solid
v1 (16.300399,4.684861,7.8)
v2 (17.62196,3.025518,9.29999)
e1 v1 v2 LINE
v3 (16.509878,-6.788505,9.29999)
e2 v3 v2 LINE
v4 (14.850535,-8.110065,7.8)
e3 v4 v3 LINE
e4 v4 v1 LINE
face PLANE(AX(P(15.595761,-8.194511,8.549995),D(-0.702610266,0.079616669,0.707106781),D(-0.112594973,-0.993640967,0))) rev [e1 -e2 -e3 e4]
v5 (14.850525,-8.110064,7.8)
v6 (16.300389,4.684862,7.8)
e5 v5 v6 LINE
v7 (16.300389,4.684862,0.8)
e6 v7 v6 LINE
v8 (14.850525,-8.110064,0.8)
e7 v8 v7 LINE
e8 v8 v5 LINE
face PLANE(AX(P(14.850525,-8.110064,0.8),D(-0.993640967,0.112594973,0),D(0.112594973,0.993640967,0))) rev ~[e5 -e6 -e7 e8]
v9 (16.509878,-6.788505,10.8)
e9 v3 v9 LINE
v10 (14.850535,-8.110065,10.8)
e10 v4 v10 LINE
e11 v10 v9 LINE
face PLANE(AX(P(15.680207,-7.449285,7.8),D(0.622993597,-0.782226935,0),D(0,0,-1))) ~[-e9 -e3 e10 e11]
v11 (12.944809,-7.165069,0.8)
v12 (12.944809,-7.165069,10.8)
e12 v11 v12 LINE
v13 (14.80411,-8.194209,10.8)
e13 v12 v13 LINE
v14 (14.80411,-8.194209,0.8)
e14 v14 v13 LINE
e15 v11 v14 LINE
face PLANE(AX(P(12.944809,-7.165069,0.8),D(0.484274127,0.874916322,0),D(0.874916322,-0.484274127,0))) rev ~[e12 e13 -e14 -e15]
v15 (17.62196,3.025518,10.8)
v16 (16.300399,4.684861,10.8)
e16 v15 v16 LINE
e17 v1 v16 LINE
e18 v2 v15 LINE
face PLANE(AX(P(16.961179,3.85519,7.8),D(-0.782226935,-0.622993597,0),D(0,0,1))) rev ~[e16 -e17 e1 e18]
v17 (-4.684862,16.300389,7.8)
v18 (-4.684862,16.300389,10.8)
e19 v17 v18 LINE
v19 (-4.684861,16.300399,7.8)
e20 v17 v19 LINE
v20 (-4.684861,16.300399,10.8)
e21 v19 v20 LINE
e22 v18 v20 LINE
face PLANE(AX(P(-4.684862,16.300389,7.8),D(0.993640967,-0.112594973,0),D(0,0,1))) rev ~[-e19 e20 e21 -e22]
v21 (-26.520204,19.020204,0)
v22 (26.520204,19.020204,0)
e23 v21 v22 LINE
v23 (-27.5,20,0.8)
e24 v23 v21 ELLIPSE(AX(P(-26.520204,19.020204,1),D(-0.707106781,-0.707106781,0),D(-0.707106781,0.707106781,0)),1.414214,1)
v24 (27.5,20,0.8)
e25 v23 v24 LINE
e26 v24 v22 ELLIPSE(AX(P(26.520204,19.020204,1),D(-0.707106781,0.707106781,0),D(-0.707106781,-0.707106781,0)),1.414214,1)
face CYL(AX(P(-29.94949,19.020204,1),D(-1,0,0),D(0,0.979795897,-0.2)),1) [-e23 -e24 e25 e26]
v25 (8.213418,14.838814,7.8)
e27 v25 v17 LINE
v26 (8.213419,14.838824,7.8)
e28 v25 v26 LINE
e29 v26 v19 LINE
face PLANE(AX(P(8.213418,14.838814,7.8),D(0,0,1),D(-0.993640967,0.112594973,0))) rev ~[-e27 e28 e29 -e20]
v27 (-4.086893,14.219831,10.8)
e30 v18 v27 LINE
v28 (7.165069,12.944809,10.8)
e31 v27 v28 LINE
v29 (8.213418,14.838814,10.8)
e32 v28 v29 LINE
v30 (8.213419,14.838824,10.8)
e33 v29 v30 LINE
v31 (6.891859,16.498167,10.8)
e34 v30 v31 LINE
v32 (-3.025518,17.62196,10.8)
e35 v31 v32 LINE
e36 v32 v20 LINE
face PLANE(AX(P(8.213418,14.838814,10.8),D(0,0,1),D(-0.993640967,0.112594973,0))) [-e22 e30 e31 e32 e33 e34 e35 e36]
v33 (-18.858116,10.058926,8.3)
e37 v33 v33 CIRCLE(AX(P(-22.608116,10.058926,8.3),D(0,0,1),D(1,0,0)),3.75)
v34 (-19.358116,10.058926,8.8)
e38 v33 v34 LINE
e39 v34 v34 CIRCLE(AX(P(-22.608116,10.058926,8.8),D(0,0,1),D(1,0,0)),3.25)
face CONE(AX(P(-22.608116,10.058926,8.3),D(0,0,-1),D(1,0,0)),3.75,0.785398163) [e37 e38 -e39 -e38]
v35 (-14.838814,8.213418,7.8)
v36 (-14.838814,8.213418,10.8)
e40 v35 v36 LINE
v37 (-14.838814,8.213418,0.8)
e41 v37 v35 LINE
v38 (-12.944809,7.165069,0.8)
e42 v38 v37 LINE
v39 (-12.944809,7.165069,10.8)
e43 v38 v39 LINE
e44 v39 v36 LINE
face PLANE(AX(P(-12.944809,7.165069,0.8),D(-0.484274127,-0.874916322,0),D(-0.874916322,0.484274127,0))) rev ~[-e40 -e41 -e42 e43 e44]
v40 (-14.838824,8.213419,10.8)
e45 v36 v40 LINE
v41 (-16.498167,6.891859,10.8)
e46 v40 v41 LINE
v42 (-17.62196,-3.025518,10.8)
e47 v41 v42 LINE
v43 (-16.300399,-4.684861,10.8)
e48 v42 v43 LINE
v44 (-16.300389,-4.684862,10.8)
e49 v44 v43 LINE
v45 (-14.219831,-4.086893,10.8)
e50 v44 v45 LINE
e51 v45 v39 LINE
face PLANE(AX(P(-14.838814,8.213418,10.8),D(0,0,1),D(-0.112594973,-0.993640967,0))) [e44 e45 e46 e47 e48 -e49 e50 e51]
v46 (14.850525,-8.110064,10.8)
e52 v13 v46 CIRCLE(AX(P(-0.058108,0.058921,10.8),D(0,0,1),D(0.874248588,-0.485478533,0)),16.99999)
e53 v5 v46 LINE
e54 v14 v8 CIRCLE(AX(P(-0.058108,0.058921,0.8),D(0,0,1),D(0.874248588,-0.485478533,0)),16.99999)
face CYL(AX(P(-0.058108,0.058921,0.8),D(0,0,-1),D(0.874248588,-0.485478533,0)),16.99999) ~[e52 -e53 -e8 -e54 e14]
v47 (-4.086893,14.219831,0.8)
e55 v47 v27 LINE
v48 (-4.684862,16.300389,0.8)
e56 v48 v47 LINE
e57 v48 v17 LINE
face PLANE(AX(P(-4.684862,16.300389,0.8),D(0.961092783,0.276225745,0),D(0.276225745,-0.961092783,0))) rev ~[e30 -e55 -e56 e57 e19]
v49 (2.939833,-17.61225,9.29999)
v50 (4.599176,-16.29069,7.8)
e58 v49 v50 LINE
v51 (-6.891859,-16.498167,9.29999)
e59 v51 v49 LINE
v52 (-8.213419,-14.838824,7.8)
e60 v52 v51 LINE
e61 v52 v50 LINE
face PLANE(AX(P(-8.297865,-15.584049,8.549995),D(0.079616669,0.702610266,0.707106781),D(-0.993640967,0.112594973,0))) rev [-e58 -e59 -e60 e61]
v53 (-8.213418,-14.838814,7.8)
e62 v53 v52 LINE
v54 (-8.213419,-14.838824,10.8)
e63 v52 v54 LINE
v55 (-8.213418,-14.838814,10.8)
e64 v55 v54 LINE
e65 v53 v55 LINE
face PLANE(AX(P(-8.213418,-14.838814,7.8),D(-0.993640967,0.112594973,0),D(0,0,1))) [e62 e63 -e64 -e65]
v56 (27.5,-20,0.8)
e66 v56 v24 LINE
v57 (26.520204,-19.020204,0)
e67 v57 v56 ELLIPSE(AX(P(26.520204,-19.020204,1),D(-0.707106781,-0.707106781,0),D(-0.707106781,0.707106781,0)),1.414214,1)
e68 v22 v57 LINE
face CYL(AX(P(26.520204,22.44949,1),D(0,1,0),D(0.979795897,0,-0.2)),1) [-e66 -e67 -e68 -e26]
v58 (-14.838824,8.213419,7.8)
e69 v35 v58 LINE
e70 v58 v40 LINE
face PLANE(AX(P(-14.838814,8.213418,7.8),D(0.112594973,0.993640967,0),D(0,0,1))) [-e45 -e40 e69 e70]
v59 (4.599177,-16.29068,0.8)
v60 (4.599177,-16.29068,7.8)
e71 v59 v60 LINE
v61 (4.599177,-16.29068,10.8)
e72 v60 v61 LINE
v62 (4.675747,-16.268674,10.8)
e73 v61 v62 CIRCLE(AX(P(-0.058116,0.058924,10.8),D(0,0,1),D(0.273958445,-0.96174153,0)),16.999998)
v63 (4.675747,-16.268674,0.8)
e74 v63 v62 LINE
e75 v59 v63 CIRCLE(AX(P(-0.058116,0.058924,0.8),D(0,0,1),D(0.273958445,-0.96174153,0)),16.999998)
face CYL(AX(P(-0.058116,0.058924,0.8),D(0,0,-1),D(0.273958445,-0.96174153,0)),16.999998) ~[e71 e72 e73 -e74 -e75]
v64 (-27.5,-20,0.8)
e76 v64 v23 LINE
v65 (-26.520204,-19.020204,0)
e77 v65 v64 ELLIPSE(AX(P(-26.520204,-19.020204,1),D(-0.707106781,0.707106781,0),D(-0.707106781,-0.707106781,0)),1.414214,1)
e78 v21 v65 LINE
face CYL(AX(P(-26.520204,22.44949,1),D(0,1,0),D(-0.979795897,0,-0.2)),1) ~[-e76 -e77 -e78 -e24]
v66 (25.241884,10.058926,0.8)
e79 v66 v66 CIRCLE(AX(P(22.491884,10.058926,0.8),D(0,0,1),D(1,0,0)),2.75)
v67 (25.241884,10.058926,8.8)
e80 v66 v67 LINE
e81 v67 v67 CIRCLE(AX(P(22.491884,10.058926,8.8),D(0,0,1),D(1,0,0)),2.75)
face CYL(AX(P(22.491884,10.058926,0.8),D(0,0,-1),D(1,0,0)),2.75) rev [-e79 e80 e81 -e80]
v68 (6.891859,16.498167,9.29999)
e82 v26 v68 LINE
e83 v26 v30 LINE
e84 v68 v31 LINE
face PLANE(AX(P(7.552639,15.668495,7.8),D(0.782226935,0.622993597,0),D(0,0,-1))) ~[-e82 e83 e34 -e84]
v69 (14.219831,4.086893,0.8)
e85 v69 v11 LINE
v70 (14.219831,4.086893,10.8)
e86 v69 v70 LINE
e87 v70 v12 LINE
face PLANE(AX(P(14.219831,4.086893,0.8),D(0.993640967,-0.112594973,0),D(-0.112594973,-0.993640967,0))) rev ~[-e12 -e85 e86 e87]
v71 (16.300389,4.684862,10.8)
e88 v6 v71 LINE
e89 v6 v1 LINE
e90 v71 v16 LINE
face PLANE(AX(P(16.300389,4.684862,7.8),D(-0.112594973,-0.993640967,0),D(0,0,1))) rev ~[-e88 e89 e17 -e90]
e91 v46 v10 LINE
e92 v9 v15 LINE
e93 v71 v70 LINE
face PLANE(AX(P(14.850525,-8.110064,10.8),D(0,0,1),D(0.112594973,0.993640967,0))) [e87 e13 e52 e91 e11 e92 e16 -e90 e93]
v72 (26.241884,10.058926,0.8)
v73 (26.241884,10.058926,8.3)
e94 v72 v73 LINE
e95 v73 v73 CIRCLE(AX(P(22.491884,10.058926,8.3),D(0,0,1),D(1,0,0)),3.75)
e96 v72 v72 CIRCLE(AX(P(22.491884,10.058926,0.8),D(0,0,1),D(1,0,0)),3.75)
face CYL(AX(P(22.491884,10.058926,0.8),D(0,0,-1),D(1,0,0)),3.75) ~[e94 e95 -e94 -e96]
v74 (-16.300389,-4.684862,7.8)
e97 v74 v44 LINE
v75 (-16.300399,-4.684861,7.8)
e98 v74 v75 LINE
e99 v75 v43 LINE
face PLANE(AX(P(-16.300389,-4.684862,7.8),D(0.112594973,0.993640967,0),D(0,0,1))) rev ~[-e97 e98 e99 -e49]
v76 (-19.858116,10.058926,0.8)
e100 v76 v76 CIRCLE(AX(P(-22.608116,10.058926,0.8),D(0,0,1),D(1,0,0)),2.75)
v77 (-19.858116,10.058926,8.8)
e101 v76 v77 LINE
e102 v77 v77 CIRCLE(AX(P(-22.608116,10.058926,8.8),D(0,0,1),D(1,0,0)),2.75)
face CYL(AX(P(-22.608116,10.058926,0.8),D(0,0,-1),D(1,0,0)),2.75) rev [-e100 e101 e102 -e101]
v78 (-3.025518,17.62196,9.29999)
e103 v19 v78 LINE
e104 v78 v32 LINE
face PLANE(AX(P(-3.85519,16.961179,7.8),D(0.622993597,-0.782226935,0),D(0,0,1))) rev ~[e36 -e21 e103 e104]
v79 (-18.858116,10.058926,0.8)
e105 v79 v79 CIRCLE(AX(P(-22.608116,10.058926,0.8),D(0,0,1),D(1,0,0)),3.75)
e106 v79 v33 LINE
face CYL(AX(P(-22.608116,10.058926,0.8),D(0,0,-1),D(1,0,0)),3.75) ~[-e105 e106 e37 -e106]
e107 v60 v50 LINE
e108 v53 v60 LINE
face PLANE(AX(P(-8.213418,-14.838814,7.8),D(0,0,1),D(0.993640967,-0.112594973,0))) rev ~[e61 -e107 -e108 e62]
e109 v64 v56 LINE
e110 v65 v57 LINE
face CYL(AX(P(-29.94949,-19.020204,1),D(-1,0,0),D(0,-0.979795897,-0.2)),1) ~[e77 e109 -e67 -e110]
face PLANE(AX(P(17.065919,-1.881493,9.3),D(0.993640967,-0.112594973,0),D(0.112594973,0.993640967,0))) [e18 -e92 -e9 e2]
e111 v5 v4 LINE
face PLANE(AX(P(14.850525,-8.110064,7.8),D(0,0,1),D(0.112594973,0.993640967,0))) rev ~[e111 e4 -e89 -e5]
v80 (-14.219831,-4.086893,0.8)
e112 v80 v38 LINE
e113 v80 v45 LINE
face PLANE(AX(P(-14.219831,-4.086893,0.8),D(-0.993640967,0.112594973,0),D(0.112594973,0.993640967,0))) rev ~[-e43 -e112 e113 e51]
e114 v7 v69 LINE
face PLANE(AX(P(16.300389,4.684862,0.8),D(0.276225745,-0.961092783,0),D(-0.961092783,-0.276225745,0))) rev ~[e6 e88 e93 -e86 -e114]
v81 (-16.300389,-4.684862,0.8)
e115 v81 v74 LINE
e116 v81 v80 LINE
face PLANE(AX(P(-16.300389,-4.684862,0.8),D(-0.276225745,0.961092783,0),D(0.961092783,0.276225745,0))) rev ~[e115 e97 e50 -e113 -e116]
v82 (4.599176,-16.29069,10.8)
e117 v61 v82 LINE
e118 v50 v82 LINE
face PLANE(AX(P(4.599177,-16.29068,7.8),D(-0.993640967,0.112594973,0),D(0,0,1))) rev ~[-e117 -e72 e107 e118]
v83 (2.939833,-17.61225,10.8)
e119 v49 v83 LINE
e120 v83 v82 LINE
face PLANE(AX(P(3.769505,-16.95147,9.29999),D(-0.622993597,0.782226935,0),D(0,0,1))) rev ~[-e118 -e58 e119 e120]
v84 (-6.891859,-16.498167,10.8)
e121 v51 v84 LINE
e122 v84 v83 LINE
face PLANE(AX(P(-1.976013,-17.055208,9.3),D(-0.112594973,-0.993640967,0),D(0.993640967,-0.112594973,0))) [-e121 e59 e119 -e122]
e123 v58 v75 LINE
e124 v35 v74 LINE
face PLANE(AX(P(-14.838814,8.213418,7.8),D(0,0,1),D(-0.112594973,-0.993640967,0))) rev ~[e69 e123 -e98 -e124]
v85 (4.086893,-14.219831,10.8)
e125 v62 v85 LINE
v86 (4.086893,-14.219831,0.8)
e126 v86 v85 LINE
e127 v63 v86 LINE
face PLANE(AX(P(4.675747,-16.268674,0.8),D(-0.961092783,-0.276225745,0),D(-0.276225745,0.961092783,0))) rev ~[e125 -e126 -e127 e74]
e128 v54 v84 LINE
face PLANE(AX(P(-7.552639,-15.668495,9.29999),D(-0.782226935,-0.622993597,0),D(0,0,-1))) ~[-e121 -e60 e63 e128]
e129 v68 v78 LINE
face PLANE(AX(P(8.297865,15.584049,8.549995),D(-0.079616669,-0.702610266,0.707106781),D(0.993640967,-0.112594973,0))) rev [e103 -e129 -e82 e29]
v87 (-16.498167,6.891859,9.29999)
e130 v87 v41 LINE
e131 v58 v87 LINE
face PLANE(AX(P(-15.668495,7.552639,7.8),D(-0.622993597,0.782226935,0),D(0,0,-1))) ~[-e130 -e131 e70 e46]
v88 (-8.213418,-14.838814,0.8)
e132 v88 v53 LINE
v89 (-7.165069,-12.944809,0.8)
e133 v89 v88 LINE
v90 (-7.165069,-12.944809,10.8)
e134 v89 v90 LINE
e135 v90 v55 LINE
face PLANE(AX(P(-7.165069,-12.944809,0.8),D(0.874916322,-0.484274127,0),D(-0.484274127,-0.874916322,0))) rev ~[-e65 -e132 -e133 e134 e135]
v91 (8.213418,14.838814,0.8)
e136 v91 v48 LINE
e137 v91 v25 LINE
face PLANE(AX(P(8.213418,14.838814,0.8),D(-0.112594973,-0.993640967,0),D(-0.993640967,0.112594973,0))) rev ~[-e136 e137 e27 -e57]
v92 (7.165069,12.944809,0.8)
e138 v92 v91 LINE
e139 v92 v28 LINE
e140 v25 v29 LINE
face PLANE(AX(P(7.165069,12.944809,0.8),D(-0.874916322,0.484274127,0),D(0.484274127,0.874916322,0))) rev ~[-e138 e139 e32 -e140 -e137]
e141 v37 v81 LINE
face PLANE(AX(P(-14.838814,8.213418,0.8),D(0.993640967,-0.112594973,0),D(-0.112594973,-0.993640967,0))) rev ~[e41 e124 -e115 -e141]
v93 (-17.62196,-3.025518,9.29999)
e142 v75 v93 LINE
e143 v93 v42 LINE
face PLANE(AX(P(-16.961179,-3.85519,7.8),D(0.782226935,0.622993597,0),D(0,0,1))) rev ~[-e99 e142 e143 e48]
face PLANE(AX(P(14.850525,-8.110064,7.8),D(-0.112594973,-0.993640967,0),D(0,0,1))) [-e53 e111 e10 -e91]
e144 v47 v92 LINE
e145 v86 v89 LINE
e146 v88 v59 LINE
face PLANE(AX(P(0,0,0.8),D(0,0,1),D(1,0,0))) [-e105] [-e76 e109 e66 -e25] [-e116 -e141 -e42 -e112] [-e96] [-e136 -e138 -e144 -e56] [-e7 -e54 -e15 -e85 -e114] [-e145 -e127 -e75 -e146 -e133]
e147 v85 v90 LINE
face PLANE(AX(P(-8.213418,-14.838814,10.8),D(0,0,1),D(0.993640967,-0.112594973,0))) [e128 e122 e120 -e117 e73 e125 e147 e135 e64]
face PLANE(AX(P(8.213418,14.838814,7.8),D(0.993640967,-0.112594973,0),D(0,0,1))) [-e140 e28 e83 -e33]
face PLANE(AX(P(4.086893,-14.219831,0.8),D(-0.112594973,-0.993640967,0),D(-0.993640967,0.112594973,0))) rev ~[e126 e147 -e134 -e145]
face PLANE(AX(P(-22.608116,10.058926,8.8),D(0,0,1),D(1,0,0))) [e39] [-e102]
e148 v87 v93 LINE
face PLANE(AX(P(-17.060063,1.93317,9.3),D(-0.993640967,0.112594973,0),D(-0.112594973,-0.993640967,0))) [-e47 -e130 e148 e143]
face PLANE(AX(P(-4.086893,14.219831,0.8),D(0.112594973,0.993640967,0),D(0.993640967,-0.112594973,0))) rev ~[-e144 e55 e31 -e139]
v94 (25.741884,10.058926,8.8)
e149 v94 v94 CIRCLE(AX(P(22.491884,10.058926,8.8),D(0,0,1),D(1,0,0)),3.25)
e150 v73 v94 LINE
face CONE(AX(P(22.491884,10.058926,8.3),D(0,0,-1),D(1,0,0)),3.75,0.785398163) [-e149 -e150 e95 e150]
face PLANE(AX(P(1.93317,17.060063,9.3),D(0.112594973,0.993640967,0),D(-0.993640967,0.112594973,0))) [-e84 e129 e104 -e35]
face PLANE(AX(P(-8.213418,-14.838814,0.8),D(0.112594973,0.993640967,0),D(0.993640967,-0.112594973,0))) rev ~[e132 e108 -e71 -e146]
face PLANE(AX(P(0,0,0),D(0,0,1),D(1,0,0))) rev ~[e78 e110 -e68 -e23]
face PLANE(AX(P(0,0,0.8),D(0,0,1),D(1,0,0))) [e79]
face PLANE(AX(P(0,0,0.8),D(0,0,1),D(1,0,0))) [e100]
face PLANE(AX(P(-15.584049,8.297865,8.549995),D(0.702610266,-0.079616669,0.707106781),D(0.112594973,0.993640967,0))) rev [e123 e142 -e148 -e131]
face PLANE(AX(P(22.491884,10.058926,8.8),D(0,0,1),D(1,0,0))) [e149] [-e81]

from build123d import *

# Parameters (mm, degrees)
F0_W         = 55
F0_H         = 40
F1_DEPTH     = 0.8
F3_DEPTH     = 10
F2_R         = 3.75
F2_R_2       = 2.75
F4_DEPTH     = 8
F5_SIZE      = 0.5
F6_W         = 12.8945924119
F6_H         = 3
F7_DEPTH     = 1.5
F8_SIZE      = 1.49999
F9_SIZE      = 1.49999
F10_W        = 12.8768104754
F10_H        = 3
F11_DEPTH    = 1.5
F12_SIZE     = 1.49999
F13_W        = 12.9808257885
F13_H        = 3
F14_DEPTH    = 1.5
F15_SIZE     = 1.49999
F16_W        = 12.9808257885
F16_H        = 3
F17_DEPTH    = 1.5
F18_SIZE     = 1.49999
F19_T1_DEPTH = 59.8989794856
F19_T3_DEPTH = 44.8989794856


# Not quite as in the source:
# - a fillet or chamfer that OpenCascade refuses, or shapes differently, is made with other operations: its cross-section is extruded or revolved along the edge and cut away or added
# - a fillet or chamfer is up to 0.001 mm smaller than in the source, because OpenCascade refuses the exact size


with BuildPart() as f1:
    # F0 (on Top) → F1 (new body)
    with BuildSketch(Plane.XY):
        Rectangle(F0_W, F0_H)
    extrude(amount=F1_DEPTH)

    # F2 (on face) → F3 (join)
    with BuildSketch(Plane.XY.offset(0.8)):
        Polygon((7.1650690396, 12.9448085418), (8.2134181145, 14.8388137473), (-4.68486218, 16.3003894709), (-4.0868929955, 14.2198308067), align=None)
        with BuildLine():
            Line((-8.2134181145, -14.8388137473), (4.5991771643, -16.2906800263))
            ThreePointArc((4.5991771643, -16.2906800263), (4.6374749925, -16.2797221091), (4.6757470388, -16.268674482))
            Line((4.6757470388, -16.268674482), (4.0868929955, -14.2198308067))
            Line((4.0868929955, -14.2198308067), (-7.1650690396, -12.9448085418))
            Line((-7.1650690396, -12.9448085418), (-8.2134181145, -14.8388137473))
        make_face()
        Polygon((-14.8388137473, 8.2134181145), (-16.3003894709, -4.68486218), (-14.2198308067, -4.0868929955), (-12.9448085418, 7.1650690396), align=None)
        with BuildLine():
            Line((14.8505253486, -8.1100642381), (16.3003894709, 4.68486218))
            Line((16.3003894709, 4.68486218), (14.2198308067, 4.0868929955))
            Line((14.2198308067, 4.0868929955), (12.9448085418, -7.1650690396))
            Line((12.9448085418, -7.1650690396), (14.8041096105, -8.1942090597))
            ThreePointArc((14.8041096105, -8.1942090597), (14.8273769365, -8.1521694464), (14.8505253486, -8.1100642381))
        make_face()
    extrude(amount=F3_DEPTH)

    # F2 (on face) → F4 (join)
    with BuildSketch(Plane.XY.offset(0.8)):
        with Locations((22.4918836008, 10.0589259832)):
            Circle(F2_R)
        with Locations((22.4918836008, 10.0589259832)):
            Circle(F2_R_2, mode=Mode.SUBTRACT)
        with Locations((-22.6081163992, 10.0589259832)):
            Circle(F2_R)
        with Locations((-22.6081163992, 10.0589259832)):
            Circle(F2_R_2, mode=Mode.SUBTRACT)
    extrude(amount=F4_DEPTH)

    # F5
    f5_edges = [f1.edges().sort_by_distance(p)[0] for p in [
        (-26.358116, 10.058926, 8.8),
        (18.741884, 10.058926, 8.8),
    ]]
    chamfer(f5_edges, length=F5_SIZE)

    # F6 (on face) → F7 (join)
    with BuildSketch(Plane(origin=(-1.7642779672, -15.5696016091, 0), x_dir=(0.9936409674, -0.1125949726, 0), z_dir=(-0.1125949726, -0.9936409674, 0))):
        with Locations((-0.0431166883, 9.3)):
            Rectangle(F6_W, F6_H)
    extrude(amount=F7_DEPTH)

    # F8 (size 1.5 in the source; OpenCascade refuses exactly that, so slightly less here)
    f8_edges = [f1.edges().sort_by_distance(p)[0] for p in [
        (-1.976013, -17.055208, 7.8),
    ]]
    chamfer(f8_edges, length=F8_SIZE)

    # F9 (size 1.5 in the source; OpenCascade refuses exactly that, so slightly less here)
    f9_edges = [f1.edges().sort_by_distance(p)[0] for p in [
        (-8.382311, -16.329275, 10.049995),
        (4.430285, -17.781141, 10.049995),
    ]]
    chamfer(f9_edges, length=F9_SIZE)

    # F10 (on face) → F11 (join)
    with BuildSketch(Plane(origin=(15.5696016091, -1.7642779672, 0), x_dir=(0.1125949726, 0.9936409674, 0), z_dir=(0.9936409674, -0.1125949726, 0))):
        with Locations((0.0520076565, 9.3)):
            Rectangle(F10_W, F10_H)
    extrude(amount=F11_DEPTH)

    # F12 (size 1.5 in the source; OpenCascade refuses exactly that, so slightly less here)
    f12_edges = [f1.edges().sort_by_distance(p)[0] for p in [
        (17.065919, -1.881493, 7.8),
        (16.340987, -8.278957, 9.3),
        (17.790851, 4.51597, 9.3),
    ]]
    chamfer(f12_edges, length=F12_SIZE)

    # F13 (on face) → F14 (join)
    with BuildSketch(Plane(origin=(1.7642779672, 15.5696016091, 0), x_dir=(-0.9936409674, 0.1125949726, 0), z_dir=(0.1125949726, 0.9936409674, 0))):
        with Locations((0, 9.3)):
            Rectangle(F13_W, F13_H)
    extrude(amount=F14_DEPTH)

    # F15 (size 1.5 in the source; OpenCascade refuses exactly that, so slightly less here)
    f15_edges = [f1.edges().sort_by_distance(p)[0] for p in [
        (8.382311, 16.329275, 9.3),
        (1.93317, 17.060063, 7.8),
        (-4.51597, 17.790851, 9.3),
    ]]
    chamfer(f15_edges, length=F15_SIZE)

    # F16 (on face) → F17 (join)
    with BuildSketch(Plane(origin=(-15.5696016091, 1.7642779672, 0), x_dir=(-0.1125949726, -0.9936409674, 0), z_dir=(-0.9936409674, 0.1125949726, 0))):
        with Locations((0, 9.3)):
            Rectangle(F16_W, F16_H)
    extrude(amount=F17_DEPTH)

    # F18 (size 1.5 in the source; OpenCascade refuses exactly that, so slightly less here)
    f18_edges = [f1.edges().sort_by_distance(p)[0] for p in [
        (-16.329275, 8.382311, 9.3),
        (-17.060063, 1.93317, 7.8),
        (-17.790851, -4.51597, 9.3),
    ]]
    chamfer(f18_edges, length=F18_SIZE)

    # F19: fillet of radius 1 on 4 edges, made by hand

    # F19_s2 → F19_t1 (cut)
    with BuildSketch(Plane.YZ.offset(-29.9494897428)):
        with BuildLine():
            ThreePointArc((-20, 0.8), (-19.6526596349, 0.2254033308), (-19.0202041029, 0))
            Line((-19.0202041029, 0), (-20, 0))
            Line((-20, 0), (-20, 0.8))
        make_face()
        with BuildLine():
            ThreePointArc((20, 0.8), (19.6526596349, 0.2254033308), (19.0202041029, 0))
            Line((19.0202041029, 0), (20, 0))
            Line((20, 0), (20, 0.8))
        make_face()
    extrude(amount=F19_T1_DEPTH, mode=Mode.SUBTRACT)

    # F19_s4 → F19_t3 (cut)
    with BuildSketch(Plane.XZ.offset(-22.4494897428)):
        with BuildLine():
            ThreePointArc((27.5, 0.8), (27.1526596349, 0.2254033308), (26.5202041029, 0))
            Line((26.5202041029, 0), (27.5, 0))
            Line((27.5, 0), (27.5, 0.8))
        make_face()
        with BuildLine():
            ThreePointArc((-27.5, 0.8), (-27.1526596349, 0.2254033308), (-26.5202041029, 0))
            Line((-26.5202041029, 0), (-27.5, 0))
            Line((-27.5, 0), (-27.5, 0.8))
        make_face()
    extrude(amount=F19_T3_DEPTH, mode=Mode.SUBTRACT)


solid = f1.part
